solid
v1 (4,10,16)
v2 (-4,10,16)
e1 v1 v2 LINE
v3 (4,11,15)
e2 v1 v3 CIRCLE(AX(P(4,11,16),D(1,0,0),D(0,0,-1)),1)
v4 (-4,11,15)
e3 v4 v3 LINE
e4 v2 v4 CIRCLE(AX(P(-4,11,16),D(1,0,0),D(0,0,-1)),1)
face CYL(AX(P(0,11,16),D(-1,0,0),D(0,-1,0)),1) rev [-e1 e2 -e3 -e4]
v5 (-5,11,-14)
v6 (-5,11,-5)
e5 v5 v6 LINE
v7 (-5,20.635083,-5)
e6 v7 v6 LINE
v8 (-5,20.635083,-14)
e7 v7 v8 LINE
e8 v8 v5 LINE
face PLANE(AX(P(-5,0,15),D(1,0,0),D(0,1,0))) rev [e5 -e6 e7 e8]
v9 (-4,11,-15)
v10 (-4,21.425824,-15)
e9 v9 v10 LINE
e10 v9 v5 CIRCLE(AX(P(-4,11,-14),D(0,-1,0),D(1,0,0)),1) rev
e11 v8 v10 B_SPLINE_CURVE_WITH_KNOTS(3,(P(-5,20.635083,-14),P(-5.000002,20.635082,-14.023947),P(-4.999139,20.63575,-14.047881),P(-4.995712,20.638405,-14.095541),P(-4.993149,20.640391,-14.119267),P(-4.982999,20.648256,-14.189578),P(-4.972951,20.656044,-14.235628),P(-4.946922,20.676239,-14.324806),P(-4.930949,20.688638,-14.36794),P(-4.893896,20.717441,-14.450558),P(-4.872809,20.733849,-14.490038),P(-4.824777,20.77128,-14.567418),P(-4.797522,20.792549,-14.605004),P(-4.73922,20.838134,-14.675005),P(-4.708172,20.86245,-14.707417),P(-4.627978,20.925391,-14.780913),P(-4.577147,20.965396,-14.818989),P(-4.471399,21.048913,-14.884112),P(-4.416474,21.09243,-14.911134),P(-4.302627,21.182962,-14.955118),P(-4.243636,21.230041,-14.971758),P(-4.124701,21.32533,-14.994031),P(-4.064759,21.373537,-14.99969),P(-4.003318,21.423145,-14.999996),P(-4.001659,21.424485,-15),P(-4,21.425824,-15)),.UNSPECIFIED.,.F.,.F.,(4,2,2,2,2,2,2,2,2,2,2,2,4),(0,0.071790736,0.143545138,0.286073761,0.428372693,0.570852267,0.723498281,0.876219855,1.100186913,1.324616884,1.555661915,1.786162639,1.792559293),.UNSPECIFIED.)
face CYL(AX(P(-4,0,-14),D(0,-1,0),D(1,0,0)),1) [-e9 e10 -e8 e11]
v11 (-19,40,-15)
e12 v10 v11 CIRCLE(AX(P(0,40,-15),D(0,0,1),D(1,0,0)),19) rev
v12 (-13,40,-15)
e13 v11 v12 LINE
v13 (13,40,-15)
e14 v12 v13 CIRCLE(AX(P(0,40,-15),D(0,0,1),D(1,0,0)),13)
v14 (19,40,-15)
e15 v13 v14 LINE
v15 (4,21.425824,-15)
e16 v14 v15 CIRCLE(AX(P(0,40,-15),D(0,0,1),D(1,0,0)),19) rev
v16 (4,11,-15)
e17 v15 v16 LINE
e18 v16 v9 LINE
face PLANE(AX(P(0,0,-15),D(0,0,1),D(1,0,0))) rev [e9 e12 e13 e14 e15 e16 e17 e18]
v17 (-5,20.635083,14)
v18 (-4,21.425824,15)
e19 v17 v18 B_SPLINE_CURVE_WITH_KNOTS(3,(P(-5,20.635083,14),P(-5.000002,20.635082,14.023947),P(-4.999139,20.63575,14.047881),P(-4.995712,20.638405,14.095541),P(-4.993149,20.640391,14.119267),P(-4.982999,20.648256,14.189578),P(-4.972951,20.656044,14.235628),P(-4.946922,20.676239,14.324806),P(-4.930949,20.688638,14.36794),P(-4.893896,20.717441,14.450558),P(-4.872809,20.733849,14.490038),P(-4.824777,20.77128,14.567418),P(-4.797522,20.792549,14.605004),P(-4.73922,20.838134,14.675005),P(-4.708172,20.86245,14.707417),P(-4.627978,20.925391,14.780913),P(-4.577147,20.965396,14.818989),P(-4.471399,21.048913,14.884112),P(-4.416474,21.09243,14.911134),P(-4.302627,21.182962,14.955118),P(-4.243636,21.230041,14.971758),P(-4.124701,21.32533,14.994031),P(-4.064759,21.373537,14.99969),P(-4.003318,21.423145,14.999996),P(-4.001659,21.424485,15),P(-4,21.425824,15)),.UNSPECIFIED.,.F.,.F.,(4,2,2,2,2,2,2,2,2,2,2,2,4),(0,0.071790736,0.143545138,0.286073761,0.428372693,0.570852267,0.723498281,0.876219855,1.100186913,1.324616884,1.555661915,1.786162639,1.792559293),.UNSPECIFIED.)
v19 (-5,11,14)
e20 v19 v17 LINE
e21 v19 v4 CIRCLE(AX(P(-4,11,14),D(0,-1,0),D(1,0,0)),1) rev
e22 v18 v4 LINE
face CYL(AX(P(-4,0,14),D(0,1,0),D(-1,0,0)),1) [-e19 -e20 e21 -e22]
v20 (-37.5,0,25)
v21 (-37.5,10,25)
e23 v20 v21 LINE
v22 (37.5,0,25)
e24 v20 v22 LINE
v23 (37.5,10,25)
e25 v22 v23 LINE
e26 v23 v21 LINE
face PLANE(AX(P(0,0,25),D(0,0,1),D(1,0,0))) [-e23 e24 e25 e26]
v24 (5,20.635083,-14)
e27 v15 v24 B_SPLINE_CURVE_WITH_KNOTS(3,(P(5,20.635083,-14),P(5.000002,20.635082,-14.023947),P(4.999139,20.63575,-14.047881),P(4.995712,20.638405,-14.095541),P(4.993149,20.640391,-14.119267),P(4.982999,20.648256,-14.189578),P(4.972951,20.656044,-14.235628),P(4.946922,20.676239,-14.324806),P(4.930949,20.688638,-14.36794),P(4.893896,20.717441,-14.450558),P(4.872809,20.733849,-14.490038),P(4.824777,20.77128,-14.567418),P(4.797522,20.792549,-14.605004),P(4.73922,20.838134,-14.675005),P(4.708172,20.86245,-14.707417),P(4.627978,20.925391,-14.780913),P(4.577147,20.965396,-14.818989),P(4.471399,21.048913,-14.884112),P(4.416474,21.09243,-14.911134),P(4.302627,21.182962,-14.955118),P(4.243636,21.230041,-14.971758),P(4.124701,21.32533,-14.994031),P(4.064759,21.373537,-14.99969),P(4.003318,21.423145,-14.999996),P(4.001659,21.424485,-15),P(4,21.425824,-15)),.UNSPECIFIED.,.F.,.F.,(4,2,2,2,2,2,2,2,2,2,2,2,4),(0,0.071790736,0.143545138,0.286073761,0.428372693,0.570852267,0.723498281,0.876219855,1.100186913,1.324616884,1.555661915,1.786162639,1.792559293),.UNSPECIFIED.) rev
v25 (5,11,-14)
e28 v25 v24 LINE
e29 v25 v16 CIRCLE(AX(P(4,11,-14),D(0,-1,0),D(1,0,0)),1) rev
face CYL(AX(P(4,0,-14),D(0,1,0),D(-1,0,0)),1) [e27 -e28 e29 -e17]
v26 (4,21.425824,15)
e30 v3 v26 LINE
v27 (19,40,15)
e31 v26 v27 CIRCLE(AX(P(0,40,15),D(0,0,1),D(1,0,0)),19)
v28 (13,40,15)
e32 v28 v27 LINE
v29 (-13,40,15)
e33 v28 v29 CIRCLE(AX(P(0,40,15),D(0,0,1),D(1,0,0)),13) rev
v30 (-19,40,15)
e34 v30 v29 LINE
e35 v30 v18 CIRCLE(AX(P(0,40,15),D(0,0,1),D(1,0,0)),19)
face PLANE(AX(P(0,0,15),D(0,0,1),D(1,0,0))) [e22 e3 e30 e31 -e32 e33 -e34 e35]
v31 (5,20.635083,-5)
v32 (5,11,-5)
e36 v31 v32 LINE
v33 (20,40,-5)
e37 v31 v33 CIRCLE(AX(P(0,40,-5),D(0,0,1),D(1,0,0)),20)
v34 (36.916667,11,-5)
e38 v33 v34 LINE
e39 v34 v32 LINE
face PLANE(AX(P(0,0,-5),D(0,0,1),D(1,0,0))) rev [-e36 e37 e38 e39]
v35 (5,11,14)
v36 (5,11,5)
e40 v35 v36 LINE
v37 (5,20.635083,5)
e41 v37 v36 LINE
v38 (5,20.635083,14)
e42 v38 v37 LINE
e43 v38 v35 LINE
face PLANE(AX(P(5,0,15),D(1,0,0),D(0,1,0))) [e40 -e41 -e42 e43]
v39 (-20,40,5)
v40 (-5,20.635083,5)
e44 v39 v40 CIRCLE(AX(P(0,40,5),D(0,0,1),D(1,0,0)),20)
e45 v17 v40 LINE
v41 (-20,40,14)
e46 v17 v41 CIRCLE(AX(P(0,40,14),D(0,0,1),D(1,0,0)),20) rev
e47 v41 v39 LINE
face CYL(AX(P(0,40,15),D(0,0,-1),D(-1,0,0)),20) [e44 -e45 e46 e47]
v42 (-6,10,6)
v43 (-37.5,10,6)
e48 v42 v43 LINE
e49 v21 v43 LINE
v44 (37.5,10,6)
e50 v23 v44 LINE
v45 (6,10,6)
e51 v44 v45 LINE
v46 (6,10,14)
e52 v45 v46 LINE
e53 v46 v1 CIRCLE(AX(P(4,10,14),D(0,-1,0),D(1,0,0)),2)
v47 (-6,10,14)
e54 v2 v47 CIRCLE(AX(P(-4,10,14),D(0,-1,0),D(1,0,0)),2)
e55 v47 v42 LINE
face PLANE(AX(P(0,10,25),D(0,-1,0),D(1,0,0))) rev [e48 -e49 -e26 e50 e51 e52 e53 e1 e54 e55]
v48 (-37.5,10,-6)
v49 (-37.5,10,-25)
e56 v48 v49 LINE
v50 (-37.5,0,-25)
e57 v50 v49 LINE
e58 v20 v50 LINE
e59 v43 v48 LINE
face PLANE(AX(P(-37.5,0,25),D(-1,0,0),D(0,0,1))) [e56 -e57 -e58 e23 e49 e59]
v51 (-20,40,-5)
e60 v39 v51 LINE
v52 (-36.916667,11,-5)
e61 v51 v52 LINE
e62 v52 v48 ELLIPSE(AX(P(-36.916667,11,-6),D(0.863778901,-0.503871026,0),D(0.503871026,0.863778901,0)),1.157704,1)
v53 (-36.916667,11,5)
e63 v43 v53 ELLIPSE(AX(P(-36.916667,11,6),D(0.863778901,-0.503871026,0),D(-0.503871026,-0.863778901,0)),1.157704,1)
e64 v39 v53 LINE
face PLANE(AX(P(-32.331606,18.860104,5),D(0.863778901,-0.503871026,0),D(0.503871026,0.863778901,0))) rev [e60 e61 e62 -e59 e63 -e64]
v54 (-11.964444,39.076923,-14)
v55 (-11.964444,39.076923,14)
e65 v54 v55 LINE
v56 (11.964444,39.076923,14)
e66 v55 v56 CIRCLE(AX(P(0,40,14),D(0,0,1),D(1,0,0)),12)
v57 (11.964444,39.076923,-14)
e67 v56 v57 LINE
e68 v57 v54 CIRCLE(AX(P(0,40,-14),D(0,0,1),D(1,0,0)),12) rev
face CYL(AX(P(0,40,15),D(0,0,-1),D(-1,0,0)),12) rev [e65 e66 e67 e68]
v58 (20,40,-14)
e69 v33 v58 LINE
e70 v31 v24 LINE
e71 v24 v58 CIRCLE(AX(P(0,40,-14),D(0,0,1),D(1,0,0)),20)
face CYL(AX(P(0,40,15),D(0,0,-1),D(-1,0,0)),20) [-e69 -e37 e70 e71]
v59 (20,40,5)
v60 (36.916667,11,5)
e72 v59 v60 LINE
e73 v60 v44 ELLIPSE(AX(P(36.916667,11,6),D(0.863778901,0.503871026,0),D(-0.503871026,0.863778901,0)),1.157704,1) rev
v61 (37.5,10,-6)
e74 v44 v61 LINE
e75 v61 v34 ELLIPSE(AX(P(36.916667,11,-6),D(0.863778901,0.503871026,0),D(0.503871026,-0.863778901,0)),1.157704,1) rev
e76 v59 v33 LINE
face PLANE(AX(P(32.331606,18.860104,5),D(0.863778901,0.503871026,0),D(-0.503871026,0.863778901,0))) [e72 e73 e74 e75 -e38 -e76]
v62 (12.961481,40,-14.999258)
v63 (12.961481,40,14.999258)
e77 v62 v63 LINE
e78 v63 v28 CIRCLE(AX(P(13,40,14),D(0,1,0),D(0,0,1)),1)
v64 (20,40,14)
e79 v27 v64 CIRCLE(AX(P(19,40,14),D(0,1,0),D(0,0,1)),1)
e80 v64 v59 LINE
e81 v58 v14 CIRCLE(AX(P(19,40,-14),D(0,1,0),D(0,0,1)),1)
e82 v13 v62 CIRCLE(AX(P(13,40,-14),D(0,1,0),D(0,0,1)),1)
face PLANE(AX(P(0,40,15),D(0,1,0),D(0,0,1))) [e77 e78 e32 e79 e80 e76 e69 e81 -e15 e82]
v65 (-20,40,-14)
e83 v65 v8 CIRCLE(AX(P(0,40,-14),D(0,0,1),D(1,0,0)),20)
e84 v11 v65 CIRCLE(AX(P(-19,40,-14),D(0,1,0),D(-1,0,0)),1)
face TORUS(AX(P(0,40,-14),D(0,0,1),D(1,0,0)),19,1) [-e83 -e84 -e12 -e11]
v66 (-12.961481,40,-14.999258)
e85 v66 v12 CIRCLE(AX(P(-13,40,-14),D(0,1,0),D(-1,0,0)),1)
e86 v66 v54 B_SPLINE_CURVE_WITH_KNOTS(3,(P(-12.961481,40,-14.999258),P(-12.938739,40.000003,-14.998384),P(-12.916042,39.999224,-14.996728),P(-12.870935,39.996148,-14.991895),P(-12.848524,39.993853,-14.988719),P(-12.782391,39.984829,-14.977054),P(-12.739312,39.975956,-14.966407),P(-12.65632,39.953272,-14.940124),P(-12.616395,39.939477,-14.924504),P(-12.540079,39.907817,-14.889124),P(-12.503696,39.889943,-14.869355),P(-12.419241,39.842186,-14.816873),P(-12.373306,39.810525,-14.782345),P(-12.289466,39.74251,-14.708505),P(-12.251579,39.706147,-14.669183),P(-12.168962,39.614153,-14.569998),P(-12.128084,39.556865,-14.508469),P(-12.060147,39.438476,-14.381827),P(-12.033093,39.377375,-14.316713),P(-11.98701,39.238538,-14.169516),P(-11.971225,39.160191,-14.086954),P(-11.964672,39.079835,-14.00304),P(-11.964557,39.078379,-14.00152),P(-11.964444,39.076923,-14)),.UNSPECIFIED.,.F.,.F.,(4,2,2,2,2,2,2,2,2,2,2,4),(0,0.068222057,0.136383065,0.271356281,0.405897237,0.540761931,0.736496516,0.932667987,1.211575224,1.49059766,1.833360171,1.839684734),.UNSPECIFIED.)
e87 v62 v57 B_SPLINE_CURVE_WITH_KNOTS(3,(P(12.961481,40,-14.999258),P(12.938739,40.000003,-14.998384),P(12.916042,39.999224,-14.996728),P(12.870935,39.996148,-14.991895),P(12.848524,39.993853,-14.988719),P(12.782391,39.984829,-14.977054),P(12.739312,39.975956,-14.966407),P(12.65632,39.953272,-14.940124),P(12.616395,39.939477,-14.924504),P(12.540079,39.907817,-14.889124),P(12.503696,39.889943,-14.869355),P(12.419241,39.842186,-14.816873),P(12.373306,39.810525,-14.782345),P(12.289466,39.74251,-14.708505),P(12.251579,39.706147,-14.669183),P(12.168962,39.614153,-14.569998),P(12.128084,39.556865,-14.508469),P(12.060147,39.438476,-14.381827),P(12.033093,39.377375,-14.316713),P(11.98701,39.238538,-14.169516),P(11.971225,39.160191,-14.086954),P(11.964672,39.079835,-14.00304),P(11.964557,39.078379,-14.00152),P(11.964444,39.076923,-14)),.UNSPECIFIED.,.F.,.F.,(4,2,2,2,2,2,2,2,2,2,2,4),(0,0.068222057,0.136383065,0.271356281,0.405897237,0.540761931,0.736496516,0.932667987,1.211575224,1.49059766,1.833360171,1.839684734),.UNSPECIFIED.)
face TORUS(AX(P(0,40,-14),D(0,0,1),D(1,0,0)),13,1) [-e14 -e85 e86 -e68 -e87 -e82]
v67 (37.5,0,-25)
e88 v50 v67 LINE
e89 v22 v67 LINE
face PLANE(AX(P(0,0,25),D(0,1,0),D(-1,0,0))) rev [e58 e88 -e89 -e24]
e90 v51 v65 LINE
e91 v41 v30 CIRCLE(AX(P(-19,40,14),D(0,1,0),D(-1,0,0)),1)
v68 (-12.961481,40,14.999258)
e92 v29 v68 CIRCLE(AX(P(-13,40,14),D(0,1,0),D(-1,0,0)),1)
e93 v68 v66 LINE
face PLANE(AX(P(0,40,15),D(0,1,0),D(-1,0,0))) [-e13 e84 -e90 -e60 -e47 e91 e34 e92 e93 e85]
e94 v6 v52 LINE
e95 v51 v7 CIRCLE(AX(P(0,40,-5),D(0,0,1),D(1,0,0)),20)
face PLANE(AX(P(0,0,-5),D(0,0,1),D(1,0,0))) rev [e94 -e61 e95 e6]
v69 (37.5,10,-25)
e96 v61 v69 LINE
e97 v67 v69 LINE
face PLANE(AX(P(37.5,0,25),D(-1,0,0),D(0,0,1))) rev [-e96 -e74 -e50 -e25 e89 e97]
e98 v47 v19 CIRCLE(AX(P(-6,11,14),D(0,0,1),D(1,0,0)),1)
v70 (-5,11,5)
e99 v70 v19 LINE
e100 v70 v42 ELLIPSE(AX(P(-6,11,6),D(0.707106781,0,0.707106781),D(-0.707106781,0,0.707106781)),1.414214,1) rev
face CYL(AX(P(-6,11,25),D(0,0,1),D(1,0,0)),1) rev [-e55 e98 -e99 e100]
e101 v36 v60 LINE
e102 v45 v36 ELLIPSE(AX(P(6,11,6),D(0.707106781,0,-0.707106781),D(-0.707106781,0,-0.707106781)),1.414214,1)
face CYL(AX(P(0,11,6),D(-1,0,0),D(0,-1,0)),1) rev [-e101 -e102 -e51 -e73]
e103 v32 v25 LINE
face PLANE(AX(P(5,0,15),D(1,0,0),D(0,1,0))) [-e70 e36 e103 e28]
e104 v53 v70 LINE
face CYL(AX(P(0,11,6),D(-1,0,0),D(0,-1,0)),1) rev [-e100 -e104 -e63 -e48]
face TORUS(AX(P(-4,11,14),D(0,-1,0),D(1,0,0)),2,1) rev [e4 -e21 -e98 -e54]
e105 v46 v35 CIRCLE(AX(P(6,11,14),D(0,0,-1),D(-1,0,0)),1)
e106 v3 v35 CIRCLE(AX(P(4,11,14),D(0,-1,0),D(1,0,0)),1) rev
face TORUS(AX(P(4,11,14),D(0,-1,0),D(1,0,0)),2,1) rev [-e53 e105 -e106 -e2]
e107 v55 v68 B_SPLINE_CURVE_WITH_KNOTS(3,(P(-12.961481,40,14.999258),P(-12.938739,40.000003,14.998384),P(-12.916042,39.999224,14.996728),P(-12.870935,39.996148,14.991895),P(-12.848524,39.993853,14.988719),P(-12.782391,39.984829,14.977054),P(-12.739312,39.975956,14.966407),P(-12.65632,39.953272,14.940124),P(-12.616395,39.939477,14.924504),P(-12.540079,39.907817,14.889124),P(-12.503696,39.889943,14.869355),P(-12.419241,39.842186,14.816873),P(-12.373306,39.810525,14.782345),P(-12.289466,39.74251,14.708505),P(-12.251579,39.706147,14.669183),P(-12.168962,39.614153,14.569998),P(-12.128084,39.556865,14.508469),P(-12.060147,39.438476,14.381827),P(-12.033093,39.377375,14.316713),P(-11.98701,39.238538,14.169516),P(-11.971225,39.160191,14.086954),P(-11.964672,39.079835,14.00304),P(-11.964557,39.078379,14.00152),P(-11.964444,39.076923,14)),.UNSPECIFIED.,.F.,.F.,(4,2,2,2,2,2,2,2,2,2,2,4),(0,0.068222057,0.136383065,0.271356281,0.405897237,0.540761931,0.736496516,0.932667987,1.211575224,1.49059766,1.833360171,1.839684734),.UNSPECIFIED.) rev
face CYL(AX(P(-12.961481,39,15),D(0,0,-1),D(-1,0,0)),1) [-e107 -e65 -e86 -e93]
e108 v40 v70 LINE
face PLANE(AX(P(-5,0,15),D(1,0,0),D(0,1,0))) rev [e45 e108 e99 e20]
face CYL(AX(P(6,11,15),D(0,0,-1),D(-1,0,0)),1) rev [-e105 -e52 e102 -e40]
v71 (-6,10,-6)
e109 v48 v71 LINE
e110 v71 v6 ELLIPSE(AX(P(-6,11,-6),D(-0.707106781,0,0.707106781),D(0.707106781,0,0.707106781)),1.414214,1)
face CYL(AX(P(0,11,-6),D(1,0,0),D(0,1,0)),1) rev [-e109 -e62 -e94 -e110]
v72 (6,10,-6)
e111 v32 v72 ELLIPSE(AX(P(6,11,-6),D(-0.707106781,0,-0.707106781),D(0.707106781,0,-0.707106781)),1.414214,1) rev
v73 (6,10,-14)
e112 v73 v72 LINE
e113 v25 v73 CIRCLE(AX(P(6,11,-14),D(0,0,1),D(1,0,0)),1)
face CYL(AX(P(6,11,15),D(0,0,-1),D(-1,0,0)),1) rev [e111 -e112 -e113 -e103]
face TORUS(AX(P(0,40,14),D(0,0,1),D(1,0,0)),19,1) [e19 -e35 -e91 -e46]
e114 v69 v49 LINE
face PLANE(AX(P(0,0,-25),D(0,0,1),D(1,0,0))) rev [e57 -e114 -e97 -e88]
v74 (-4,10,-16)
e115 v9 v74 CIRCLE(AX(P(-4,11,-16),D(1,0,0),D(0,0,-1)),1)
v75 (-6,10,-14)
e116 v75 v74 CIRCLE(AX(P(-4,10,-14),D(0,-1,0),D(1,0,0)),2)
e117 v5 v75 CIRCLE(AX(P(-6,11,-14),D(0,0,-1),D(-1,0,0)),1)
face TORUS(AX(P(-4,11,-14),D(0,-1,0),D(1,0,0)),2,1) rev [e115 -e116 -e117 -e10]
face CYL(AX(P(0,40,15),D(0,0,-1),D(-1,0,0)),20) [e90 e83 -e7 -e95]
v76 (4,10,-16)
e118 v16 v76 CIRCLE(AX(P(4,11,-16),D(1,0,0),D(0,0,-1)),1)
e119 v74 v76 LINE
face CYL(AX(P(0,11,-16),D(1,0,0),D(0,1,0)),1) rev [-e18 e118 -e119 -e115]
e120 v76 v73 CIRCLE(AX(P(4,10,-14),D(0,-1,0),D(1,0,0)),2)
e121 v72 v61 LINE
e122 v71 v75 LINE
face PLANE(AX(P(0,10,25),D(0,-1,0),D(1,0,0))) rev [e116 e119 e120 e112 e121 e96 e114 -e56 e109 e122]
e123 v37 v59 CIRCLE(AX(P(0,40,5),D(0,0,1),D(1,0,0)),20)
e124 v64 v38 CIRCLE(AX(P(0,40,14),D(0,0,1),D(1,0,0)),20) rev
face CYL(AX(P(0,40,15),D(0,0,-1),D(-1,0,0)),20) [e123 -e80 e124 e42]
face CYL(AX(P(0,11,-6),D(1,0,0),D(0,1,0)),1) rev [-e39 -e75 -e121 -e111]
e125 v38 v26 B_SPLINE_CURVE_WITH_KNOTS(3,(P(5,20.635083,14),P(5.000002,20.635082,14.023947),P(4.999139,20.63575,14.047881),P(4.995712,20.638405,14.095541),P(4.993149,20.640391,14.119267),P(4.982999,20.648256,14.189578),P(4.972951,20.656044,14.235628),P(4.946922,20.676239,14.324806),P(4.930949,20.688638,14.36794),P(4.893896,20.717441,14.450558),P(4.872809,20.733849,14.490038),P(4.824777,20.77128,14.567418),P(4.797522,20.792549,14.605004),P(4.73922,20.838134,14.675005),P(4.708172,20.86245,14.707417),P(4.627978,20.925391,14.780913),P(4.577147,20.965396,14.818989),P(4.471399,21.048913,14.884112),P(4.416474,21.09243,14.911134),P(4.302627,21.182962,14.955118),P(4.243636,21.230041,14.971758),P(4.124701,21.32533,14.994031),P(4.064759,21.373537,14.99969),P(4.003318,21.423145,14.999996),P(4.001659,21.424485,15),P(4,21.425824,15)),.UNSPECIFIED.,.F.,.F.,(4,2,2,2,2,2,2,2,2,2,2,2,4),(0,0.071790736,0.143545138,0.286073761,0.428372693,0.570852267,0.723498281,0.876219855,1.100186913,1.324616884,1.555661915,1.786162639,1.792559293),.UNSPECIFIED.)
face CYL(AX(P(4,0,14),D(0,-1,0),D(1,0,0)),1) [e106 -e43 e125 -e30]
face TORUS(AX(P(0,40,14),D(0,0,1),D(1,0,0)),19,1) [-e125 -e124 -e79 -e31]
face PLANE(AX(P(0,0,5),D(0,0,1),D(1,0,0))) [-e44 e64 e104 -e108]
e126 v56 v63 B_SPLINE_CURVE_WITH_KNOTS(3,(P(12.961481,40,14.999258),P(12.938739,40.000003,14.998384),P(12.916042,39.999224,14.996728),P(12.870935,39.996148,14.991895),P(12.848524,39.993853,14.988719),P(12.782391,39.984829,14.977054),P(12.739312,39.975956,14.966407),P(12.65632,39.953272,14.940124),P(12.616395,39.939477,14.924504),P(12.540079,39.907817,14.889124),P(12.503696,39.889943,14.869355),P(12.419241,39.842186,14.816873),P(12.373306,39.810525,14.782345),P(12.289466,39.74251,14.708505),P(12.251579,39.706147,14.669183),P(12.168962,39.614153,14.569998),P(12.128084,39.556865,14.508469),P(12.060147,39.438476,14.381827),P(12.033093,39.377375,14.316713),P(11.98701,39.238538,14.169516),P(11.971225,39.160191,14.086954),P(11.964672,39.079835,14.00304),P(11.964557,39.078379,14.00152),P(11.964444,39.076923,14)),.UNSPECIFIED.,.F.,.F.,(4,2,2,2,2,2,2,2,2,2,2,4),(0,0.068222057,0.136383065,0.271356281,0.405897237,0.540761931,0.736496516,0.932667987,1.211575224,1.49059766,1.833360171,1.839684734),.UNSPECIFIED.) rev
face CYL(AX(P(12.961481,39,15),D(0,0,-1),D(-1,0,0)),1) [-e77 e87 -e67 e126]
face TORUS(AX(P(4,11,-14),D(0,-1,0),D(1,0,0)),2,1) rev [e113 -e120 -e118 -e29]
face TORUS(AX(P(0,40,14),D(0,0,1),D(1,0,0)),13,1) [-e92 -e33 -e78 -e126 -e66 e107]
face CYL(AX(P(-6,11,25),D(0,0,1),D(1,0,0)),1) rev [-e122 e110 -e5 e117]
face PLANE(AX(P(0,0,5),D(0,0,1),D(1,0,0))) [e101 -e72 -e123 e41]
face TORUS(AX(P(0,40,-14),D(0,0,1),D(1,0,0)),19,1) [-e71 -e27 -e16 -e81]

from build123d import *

# Parameters (mm, degrees)
SKETCH1_W           = 75
SKETCH1_H           = 10
BOSS_EXTRUDE5_DEPTH = 25
BOSS_EXTRUDE6_DEPTH = 15
BOSS_EXTRUDE7_DEPTH = 5
FILLET2_R           = 1
FILLET3_R           = 1


with BuildPart() as part:
    # Sketch1 → Boss-Extrude5 (new, symmetric)
    with BuildSketch(Plane.XY):
        with Locations((0, 5)):
            Rectangle(SKETCH1_W, SKETCH1_H)
    extrude(amount=BOSS_EXTRUDE5_DEPTH, both=True)

    # Sketch1<9> → Boss-Extrude6 (add, symmetric)
    with BuildSketch(Plane.XY):
        with BuildLine():
            Line((-5, 20.635083269), (-5, 10))
            Line((-5, 10), (5, 10))
            Line((5, 10), (5, 20.635083269))
            ThreePointArc((5, 20.635083269), (15.811388301, 27.752551286), (20, 40))
            Line((20, 40), (12, 40))
            ThreePointArc((12, 40), (0, 28), (-12, 40))
            Line((-12, 40), (-20, 40))
            ThreePointArc((-20, 40), (-15.811388301, 27.752551286), (-5, 20.635083269))
        make_face()
    extrude(amount=BOSS_EXTRUDE6_DEPTH, both=True)

    # Sketch1<10> → Boss-Extrude7 (add, symmetric)
    with BuildSketch(Plane.XY):
        with BuildLine():
            Line((5, 10), (37.5, 10))
            Line((37.5, 10), (20, 40))
            ThreePointArc((20, 40), (15.811388301, 27.752551286), (5, 20.635083269))
            Line((5, 20.635083269), (5, 10))
        make_face()
        with BuildLine():
            Line((-20, 40), (-37.5, 10))
            Line((-37.5, 10), (-5, 10))
            Line((-5, 10), (-5, 20.635083269))
            ThreePointArc((-5, 20.635083269), (-15.811388301, 27.752551286), (-20, 40))
        make_face()
    extrude(amount=BOSS_EXTRUDE7_DEPTH, both=True)

    # Fillet2
    fillet2_edges = [part.edges().sort_by_distance(p)[0] for p in [
        (-12, 40, 0),
        (-15.811388301, 27.752551286, -15),
        (-5, 15.317541634, -15),
        (5, 15.317541634, 15),
        (15.811388301, 27.752551286, -15),
        (0, 28, 15),
        (12, 40, 0),
        (-15.811388301, 27.752551286, 15),
        (-5, 15.317541634, 15),
        (15.811388301, 27.752551286, 15),
        (0, 28, -15),
        (5, 15.317541634, -15),
    ]]
    fillet(fillet2_edges, radius=FILLET2_R)

    # Fillet3
    # the kernel refuses this fillet: 1 mm, written as the material it adds along each edge
    with BuildSketch(Plane(origin=(5, 10, -14), x_dir=(1, 0, 0), z_dir=(0, 0, 1)), Plane(origin=(5, 10, 2.5), x_dir=(1, 0, 0), z_dir=(0, 0, 1))) as fillet3_piece_1:
        with BuildLine():
            CenterArc((FILLET3_R, FILLET3_R), FILLET3_R, 180, 90)
            Line((0, FILLET3_R), (0, 0))
            Line((0, 0), (FILLET3_R, 0))
        make_face()
    extrude(amount=11.5)
    with BuildSketch(Plane(origin=(-5, 10, -14), x_dir=(-1, 0, 0), z_dir=(0, 0, 1)), Plane(origin=(-5, 10, 2.5), x_dir=(-1, 0, 0), z_dir=(0, 0, 1))) as fillet3_piece_2:
        with BuildLine():
            CenterArc((FILLET3_R, -FILLET3_R), FILLET3_R, 90, 90)
            Line((0, -FILLET3_R), (0, 0))
            Line((0, 0), (FILLET3_R, 0))
        make_face()
    extrude(amount=11.5)
    with BuildSketch(Plane(origin=(2.5, 10, 5), x_dir=(0, 0, 1), z_dir=(1, 0, 0))) as fillet3_piece_3_section:
        with BuildLine():
            CenterArc((FILLET3_R, -FILLET3_R), FILLET3_R, 90, 90)
            Line((0, -FILLET3_R), (0, 0))
            Line((0, 0), (FILLET3_R, 0))
        make_face()
    fillet3_piece_3 = extrude(amount=35, mode=Mode.PRIVATE)
    fillet3_piece_3 = split(fillet3_piece_3, bisect_by=Plane(origin=(28.832812489, 24.858035733, 5.226395114), z_dir=(-0.8637789008984333, -0.5038710255240864, 0)), keep=Keep.TOP, mode=Mode.PRIVATE)
    add(fillet3_piece_3)
    with BuildSketch(Plane(origin=(2.5, 10, -5), x_dir=(0, 0, -1), z_dir=(1, 0, 0))) as fillet3_piece_4_section:
        with BuildLine():
            CenterArc((FILLET3_R, FILLET3_R), FILLET3_R, 180, 90)
            Line((0, FILLET3_R), (0, 0))
            Line((0, 0), (FILLET3_R, 0))
        make_face()
    fillet3_piece_4 = extrude(amount=35, mode=Mode.PRIVATE)
    fillet3_piece_4 = split(fillet3_piece_4, bisect_by=Plane(origin=(28.832812489, 24.858035733, -5.226395114), z_dir=(-0.8637789008984333, -0.5038710255240864, 0)), keep=Keep.TOP, mode=Mode.PRIVATE)
    add(fillet3_piece_4)
    with BuildSketch(Plane(origin=(-37.5, 10, 5), x_dir=(0, 0, 1), z_dir=(1, 0, 0))) as fillet3_piece_5_section:
        with BuildLine():
            CenterArc((FILLET3_R, -FILLET3_R), FILLET3_R, 90, 90)
            Line((0, -FILLET3_R), (0, 0))
            Line((0, 0), (FILLET3_R, 0))
        make_face()
    fillet3_piece_5 = extrude(amount=35, mode=Mode.PRIVATE)
    fillet3_piece_5 = split(fillet3_piece_5, bisect_by=Plane(origin=(-33.259418432, 17.269568402, 5.226886144), z_dir=(0.8637789008984326, -0.5038710255240878, 0)), keep=Keep.TOP, mode=Mode.PRIVATE)
    add(fillet3_piece_5)
    with BuildSketch(Plane(origin=(-37.5, 10, -5), x_dir=(0, 0, -1), z_dir=(1, 0, 0))) as fillet3_piece_6_section:
        with BuildLine():
            CenterArc((FILLET3_R, FILLET3_R), FILLET3_R, 180, 90)
            Line((0, FILLET3_R), (0, 0))
            Line((0, 0), (FILLET3_R, 0))
        make_face()
    fillet3_piece_6 = extrude(amount=35, mode=Mode.PRIVATE)
    fillet3_piece_6 = split(fillet3_piece_6, bisect_by=Plane(origin=(-33.259418432, 17.269568402, -5.226886144), z_dir=(0.8637789008984326, -0.5038710255240878, 0)), keep=Keep.TOP, mode=Mode.PRIVATE)
    add(fillet3_piece_6)
    with BuildSketch(Plane(origin=(-4, 10, 15), x_dir=(0, 0, 1), z_dir=(1, 0, 0))) as fillet3_piece_7:
        with BuildLine():
            CenterArc((FILLET3_R, -FILLET3_R), FILLET3_R, 90, 90)
            Line((0, -FILLET3_R), (0, 0))
            Line((0, 0), (FILLET3_R, 0))
        make_face()
    extrude(amount=8)
    with BuildSketch(Plane(origin=(-4, 10, -15), x_dir=(0, 0, -1), z_dir=(1, 0, 0))) as fillet3_piece_8:
        with BuildLine():
            CenterArc((FILLET3_R, FILLET3_R), FILLET3_R, 180, 90)
            Line((0, FILLET3_R), (0, 0))
            Line((0, 0), (FILLET3_R, 0))
        make_face()
    extrude(amount=8)
    with BuildSketch(Plane(origin=(-4, 10, 14), x_dir=(0, 0, 1), z_dir=(1, 0, 0))) as fillet3_piece_9:
        with BuildLine():
            CenterArc((1 + FILLET3_R, -FILLET3_R), FILLET3_R, 90, 90)
            Line((1, -FILLET3_R), (1, 0))
            Line((1, 0), (1 + FILLET3_R, 0))
        make_face()
    revolve(axis=Axis((-4, 10, 14), (0, -1, 0)), revolution_arc=90)
    with BuildSketch(Plane(origin=(4, 10, 14), x_dir=(1, 0, 0), z_dir=(0, 0, -1))) as fillet3_piece_10:
        with BuildLine():
            CenterArc((1 + FILLET3_R, -FILLET3_R), FILLET3_R, 90, 90)
            Line((1, -FILLET3_R), (1, 0))
            Line((1, 0), (1 + FILLET3_R, 0))
        make_face()
    revolve(axis=Axis((4, 10, 14), (0, -1, 0)), revolution_arc=90)
    with BuildSketch(Plane(origin=(4, 10, -14), x_dir=(0, 0, -1), z_dir=(-1, 0, 0))) as fillet3_piece_11:
        with BuildLine():
            CenterArc((1 + FILLET3_R, -FILLET3_R), FILLET3_R, 90, 90)
            Line((1, -FILLET3_R), (1, 0))
            Line((1, 0), (1 + FILLET3_R, 0))
        make_face()
    revolve(axis=Axis((4, 10, -14), (0, -1, 0)), revolution_arc=90)
    with BuildSketch(Plane(origin=(-4, 10, -14), x_dir=(-1, 0, 0), z_dir=(0, 0, 1))) as fillet3_piece_12:
        with BuildLine():
            CenterArc((1 + FILLET3_R, -FILLET3_R), FILLET3_R, 90, 90)
            Line((1, -FILLET3_R), (1, 0))
            Line((1, 0), (1 + FILLET3_R, 0))
        make_face()
    revolve(axis=Axis((-4, 10, -14), (0, -1, 0)), revolution_arc=90)


solid = part.part
